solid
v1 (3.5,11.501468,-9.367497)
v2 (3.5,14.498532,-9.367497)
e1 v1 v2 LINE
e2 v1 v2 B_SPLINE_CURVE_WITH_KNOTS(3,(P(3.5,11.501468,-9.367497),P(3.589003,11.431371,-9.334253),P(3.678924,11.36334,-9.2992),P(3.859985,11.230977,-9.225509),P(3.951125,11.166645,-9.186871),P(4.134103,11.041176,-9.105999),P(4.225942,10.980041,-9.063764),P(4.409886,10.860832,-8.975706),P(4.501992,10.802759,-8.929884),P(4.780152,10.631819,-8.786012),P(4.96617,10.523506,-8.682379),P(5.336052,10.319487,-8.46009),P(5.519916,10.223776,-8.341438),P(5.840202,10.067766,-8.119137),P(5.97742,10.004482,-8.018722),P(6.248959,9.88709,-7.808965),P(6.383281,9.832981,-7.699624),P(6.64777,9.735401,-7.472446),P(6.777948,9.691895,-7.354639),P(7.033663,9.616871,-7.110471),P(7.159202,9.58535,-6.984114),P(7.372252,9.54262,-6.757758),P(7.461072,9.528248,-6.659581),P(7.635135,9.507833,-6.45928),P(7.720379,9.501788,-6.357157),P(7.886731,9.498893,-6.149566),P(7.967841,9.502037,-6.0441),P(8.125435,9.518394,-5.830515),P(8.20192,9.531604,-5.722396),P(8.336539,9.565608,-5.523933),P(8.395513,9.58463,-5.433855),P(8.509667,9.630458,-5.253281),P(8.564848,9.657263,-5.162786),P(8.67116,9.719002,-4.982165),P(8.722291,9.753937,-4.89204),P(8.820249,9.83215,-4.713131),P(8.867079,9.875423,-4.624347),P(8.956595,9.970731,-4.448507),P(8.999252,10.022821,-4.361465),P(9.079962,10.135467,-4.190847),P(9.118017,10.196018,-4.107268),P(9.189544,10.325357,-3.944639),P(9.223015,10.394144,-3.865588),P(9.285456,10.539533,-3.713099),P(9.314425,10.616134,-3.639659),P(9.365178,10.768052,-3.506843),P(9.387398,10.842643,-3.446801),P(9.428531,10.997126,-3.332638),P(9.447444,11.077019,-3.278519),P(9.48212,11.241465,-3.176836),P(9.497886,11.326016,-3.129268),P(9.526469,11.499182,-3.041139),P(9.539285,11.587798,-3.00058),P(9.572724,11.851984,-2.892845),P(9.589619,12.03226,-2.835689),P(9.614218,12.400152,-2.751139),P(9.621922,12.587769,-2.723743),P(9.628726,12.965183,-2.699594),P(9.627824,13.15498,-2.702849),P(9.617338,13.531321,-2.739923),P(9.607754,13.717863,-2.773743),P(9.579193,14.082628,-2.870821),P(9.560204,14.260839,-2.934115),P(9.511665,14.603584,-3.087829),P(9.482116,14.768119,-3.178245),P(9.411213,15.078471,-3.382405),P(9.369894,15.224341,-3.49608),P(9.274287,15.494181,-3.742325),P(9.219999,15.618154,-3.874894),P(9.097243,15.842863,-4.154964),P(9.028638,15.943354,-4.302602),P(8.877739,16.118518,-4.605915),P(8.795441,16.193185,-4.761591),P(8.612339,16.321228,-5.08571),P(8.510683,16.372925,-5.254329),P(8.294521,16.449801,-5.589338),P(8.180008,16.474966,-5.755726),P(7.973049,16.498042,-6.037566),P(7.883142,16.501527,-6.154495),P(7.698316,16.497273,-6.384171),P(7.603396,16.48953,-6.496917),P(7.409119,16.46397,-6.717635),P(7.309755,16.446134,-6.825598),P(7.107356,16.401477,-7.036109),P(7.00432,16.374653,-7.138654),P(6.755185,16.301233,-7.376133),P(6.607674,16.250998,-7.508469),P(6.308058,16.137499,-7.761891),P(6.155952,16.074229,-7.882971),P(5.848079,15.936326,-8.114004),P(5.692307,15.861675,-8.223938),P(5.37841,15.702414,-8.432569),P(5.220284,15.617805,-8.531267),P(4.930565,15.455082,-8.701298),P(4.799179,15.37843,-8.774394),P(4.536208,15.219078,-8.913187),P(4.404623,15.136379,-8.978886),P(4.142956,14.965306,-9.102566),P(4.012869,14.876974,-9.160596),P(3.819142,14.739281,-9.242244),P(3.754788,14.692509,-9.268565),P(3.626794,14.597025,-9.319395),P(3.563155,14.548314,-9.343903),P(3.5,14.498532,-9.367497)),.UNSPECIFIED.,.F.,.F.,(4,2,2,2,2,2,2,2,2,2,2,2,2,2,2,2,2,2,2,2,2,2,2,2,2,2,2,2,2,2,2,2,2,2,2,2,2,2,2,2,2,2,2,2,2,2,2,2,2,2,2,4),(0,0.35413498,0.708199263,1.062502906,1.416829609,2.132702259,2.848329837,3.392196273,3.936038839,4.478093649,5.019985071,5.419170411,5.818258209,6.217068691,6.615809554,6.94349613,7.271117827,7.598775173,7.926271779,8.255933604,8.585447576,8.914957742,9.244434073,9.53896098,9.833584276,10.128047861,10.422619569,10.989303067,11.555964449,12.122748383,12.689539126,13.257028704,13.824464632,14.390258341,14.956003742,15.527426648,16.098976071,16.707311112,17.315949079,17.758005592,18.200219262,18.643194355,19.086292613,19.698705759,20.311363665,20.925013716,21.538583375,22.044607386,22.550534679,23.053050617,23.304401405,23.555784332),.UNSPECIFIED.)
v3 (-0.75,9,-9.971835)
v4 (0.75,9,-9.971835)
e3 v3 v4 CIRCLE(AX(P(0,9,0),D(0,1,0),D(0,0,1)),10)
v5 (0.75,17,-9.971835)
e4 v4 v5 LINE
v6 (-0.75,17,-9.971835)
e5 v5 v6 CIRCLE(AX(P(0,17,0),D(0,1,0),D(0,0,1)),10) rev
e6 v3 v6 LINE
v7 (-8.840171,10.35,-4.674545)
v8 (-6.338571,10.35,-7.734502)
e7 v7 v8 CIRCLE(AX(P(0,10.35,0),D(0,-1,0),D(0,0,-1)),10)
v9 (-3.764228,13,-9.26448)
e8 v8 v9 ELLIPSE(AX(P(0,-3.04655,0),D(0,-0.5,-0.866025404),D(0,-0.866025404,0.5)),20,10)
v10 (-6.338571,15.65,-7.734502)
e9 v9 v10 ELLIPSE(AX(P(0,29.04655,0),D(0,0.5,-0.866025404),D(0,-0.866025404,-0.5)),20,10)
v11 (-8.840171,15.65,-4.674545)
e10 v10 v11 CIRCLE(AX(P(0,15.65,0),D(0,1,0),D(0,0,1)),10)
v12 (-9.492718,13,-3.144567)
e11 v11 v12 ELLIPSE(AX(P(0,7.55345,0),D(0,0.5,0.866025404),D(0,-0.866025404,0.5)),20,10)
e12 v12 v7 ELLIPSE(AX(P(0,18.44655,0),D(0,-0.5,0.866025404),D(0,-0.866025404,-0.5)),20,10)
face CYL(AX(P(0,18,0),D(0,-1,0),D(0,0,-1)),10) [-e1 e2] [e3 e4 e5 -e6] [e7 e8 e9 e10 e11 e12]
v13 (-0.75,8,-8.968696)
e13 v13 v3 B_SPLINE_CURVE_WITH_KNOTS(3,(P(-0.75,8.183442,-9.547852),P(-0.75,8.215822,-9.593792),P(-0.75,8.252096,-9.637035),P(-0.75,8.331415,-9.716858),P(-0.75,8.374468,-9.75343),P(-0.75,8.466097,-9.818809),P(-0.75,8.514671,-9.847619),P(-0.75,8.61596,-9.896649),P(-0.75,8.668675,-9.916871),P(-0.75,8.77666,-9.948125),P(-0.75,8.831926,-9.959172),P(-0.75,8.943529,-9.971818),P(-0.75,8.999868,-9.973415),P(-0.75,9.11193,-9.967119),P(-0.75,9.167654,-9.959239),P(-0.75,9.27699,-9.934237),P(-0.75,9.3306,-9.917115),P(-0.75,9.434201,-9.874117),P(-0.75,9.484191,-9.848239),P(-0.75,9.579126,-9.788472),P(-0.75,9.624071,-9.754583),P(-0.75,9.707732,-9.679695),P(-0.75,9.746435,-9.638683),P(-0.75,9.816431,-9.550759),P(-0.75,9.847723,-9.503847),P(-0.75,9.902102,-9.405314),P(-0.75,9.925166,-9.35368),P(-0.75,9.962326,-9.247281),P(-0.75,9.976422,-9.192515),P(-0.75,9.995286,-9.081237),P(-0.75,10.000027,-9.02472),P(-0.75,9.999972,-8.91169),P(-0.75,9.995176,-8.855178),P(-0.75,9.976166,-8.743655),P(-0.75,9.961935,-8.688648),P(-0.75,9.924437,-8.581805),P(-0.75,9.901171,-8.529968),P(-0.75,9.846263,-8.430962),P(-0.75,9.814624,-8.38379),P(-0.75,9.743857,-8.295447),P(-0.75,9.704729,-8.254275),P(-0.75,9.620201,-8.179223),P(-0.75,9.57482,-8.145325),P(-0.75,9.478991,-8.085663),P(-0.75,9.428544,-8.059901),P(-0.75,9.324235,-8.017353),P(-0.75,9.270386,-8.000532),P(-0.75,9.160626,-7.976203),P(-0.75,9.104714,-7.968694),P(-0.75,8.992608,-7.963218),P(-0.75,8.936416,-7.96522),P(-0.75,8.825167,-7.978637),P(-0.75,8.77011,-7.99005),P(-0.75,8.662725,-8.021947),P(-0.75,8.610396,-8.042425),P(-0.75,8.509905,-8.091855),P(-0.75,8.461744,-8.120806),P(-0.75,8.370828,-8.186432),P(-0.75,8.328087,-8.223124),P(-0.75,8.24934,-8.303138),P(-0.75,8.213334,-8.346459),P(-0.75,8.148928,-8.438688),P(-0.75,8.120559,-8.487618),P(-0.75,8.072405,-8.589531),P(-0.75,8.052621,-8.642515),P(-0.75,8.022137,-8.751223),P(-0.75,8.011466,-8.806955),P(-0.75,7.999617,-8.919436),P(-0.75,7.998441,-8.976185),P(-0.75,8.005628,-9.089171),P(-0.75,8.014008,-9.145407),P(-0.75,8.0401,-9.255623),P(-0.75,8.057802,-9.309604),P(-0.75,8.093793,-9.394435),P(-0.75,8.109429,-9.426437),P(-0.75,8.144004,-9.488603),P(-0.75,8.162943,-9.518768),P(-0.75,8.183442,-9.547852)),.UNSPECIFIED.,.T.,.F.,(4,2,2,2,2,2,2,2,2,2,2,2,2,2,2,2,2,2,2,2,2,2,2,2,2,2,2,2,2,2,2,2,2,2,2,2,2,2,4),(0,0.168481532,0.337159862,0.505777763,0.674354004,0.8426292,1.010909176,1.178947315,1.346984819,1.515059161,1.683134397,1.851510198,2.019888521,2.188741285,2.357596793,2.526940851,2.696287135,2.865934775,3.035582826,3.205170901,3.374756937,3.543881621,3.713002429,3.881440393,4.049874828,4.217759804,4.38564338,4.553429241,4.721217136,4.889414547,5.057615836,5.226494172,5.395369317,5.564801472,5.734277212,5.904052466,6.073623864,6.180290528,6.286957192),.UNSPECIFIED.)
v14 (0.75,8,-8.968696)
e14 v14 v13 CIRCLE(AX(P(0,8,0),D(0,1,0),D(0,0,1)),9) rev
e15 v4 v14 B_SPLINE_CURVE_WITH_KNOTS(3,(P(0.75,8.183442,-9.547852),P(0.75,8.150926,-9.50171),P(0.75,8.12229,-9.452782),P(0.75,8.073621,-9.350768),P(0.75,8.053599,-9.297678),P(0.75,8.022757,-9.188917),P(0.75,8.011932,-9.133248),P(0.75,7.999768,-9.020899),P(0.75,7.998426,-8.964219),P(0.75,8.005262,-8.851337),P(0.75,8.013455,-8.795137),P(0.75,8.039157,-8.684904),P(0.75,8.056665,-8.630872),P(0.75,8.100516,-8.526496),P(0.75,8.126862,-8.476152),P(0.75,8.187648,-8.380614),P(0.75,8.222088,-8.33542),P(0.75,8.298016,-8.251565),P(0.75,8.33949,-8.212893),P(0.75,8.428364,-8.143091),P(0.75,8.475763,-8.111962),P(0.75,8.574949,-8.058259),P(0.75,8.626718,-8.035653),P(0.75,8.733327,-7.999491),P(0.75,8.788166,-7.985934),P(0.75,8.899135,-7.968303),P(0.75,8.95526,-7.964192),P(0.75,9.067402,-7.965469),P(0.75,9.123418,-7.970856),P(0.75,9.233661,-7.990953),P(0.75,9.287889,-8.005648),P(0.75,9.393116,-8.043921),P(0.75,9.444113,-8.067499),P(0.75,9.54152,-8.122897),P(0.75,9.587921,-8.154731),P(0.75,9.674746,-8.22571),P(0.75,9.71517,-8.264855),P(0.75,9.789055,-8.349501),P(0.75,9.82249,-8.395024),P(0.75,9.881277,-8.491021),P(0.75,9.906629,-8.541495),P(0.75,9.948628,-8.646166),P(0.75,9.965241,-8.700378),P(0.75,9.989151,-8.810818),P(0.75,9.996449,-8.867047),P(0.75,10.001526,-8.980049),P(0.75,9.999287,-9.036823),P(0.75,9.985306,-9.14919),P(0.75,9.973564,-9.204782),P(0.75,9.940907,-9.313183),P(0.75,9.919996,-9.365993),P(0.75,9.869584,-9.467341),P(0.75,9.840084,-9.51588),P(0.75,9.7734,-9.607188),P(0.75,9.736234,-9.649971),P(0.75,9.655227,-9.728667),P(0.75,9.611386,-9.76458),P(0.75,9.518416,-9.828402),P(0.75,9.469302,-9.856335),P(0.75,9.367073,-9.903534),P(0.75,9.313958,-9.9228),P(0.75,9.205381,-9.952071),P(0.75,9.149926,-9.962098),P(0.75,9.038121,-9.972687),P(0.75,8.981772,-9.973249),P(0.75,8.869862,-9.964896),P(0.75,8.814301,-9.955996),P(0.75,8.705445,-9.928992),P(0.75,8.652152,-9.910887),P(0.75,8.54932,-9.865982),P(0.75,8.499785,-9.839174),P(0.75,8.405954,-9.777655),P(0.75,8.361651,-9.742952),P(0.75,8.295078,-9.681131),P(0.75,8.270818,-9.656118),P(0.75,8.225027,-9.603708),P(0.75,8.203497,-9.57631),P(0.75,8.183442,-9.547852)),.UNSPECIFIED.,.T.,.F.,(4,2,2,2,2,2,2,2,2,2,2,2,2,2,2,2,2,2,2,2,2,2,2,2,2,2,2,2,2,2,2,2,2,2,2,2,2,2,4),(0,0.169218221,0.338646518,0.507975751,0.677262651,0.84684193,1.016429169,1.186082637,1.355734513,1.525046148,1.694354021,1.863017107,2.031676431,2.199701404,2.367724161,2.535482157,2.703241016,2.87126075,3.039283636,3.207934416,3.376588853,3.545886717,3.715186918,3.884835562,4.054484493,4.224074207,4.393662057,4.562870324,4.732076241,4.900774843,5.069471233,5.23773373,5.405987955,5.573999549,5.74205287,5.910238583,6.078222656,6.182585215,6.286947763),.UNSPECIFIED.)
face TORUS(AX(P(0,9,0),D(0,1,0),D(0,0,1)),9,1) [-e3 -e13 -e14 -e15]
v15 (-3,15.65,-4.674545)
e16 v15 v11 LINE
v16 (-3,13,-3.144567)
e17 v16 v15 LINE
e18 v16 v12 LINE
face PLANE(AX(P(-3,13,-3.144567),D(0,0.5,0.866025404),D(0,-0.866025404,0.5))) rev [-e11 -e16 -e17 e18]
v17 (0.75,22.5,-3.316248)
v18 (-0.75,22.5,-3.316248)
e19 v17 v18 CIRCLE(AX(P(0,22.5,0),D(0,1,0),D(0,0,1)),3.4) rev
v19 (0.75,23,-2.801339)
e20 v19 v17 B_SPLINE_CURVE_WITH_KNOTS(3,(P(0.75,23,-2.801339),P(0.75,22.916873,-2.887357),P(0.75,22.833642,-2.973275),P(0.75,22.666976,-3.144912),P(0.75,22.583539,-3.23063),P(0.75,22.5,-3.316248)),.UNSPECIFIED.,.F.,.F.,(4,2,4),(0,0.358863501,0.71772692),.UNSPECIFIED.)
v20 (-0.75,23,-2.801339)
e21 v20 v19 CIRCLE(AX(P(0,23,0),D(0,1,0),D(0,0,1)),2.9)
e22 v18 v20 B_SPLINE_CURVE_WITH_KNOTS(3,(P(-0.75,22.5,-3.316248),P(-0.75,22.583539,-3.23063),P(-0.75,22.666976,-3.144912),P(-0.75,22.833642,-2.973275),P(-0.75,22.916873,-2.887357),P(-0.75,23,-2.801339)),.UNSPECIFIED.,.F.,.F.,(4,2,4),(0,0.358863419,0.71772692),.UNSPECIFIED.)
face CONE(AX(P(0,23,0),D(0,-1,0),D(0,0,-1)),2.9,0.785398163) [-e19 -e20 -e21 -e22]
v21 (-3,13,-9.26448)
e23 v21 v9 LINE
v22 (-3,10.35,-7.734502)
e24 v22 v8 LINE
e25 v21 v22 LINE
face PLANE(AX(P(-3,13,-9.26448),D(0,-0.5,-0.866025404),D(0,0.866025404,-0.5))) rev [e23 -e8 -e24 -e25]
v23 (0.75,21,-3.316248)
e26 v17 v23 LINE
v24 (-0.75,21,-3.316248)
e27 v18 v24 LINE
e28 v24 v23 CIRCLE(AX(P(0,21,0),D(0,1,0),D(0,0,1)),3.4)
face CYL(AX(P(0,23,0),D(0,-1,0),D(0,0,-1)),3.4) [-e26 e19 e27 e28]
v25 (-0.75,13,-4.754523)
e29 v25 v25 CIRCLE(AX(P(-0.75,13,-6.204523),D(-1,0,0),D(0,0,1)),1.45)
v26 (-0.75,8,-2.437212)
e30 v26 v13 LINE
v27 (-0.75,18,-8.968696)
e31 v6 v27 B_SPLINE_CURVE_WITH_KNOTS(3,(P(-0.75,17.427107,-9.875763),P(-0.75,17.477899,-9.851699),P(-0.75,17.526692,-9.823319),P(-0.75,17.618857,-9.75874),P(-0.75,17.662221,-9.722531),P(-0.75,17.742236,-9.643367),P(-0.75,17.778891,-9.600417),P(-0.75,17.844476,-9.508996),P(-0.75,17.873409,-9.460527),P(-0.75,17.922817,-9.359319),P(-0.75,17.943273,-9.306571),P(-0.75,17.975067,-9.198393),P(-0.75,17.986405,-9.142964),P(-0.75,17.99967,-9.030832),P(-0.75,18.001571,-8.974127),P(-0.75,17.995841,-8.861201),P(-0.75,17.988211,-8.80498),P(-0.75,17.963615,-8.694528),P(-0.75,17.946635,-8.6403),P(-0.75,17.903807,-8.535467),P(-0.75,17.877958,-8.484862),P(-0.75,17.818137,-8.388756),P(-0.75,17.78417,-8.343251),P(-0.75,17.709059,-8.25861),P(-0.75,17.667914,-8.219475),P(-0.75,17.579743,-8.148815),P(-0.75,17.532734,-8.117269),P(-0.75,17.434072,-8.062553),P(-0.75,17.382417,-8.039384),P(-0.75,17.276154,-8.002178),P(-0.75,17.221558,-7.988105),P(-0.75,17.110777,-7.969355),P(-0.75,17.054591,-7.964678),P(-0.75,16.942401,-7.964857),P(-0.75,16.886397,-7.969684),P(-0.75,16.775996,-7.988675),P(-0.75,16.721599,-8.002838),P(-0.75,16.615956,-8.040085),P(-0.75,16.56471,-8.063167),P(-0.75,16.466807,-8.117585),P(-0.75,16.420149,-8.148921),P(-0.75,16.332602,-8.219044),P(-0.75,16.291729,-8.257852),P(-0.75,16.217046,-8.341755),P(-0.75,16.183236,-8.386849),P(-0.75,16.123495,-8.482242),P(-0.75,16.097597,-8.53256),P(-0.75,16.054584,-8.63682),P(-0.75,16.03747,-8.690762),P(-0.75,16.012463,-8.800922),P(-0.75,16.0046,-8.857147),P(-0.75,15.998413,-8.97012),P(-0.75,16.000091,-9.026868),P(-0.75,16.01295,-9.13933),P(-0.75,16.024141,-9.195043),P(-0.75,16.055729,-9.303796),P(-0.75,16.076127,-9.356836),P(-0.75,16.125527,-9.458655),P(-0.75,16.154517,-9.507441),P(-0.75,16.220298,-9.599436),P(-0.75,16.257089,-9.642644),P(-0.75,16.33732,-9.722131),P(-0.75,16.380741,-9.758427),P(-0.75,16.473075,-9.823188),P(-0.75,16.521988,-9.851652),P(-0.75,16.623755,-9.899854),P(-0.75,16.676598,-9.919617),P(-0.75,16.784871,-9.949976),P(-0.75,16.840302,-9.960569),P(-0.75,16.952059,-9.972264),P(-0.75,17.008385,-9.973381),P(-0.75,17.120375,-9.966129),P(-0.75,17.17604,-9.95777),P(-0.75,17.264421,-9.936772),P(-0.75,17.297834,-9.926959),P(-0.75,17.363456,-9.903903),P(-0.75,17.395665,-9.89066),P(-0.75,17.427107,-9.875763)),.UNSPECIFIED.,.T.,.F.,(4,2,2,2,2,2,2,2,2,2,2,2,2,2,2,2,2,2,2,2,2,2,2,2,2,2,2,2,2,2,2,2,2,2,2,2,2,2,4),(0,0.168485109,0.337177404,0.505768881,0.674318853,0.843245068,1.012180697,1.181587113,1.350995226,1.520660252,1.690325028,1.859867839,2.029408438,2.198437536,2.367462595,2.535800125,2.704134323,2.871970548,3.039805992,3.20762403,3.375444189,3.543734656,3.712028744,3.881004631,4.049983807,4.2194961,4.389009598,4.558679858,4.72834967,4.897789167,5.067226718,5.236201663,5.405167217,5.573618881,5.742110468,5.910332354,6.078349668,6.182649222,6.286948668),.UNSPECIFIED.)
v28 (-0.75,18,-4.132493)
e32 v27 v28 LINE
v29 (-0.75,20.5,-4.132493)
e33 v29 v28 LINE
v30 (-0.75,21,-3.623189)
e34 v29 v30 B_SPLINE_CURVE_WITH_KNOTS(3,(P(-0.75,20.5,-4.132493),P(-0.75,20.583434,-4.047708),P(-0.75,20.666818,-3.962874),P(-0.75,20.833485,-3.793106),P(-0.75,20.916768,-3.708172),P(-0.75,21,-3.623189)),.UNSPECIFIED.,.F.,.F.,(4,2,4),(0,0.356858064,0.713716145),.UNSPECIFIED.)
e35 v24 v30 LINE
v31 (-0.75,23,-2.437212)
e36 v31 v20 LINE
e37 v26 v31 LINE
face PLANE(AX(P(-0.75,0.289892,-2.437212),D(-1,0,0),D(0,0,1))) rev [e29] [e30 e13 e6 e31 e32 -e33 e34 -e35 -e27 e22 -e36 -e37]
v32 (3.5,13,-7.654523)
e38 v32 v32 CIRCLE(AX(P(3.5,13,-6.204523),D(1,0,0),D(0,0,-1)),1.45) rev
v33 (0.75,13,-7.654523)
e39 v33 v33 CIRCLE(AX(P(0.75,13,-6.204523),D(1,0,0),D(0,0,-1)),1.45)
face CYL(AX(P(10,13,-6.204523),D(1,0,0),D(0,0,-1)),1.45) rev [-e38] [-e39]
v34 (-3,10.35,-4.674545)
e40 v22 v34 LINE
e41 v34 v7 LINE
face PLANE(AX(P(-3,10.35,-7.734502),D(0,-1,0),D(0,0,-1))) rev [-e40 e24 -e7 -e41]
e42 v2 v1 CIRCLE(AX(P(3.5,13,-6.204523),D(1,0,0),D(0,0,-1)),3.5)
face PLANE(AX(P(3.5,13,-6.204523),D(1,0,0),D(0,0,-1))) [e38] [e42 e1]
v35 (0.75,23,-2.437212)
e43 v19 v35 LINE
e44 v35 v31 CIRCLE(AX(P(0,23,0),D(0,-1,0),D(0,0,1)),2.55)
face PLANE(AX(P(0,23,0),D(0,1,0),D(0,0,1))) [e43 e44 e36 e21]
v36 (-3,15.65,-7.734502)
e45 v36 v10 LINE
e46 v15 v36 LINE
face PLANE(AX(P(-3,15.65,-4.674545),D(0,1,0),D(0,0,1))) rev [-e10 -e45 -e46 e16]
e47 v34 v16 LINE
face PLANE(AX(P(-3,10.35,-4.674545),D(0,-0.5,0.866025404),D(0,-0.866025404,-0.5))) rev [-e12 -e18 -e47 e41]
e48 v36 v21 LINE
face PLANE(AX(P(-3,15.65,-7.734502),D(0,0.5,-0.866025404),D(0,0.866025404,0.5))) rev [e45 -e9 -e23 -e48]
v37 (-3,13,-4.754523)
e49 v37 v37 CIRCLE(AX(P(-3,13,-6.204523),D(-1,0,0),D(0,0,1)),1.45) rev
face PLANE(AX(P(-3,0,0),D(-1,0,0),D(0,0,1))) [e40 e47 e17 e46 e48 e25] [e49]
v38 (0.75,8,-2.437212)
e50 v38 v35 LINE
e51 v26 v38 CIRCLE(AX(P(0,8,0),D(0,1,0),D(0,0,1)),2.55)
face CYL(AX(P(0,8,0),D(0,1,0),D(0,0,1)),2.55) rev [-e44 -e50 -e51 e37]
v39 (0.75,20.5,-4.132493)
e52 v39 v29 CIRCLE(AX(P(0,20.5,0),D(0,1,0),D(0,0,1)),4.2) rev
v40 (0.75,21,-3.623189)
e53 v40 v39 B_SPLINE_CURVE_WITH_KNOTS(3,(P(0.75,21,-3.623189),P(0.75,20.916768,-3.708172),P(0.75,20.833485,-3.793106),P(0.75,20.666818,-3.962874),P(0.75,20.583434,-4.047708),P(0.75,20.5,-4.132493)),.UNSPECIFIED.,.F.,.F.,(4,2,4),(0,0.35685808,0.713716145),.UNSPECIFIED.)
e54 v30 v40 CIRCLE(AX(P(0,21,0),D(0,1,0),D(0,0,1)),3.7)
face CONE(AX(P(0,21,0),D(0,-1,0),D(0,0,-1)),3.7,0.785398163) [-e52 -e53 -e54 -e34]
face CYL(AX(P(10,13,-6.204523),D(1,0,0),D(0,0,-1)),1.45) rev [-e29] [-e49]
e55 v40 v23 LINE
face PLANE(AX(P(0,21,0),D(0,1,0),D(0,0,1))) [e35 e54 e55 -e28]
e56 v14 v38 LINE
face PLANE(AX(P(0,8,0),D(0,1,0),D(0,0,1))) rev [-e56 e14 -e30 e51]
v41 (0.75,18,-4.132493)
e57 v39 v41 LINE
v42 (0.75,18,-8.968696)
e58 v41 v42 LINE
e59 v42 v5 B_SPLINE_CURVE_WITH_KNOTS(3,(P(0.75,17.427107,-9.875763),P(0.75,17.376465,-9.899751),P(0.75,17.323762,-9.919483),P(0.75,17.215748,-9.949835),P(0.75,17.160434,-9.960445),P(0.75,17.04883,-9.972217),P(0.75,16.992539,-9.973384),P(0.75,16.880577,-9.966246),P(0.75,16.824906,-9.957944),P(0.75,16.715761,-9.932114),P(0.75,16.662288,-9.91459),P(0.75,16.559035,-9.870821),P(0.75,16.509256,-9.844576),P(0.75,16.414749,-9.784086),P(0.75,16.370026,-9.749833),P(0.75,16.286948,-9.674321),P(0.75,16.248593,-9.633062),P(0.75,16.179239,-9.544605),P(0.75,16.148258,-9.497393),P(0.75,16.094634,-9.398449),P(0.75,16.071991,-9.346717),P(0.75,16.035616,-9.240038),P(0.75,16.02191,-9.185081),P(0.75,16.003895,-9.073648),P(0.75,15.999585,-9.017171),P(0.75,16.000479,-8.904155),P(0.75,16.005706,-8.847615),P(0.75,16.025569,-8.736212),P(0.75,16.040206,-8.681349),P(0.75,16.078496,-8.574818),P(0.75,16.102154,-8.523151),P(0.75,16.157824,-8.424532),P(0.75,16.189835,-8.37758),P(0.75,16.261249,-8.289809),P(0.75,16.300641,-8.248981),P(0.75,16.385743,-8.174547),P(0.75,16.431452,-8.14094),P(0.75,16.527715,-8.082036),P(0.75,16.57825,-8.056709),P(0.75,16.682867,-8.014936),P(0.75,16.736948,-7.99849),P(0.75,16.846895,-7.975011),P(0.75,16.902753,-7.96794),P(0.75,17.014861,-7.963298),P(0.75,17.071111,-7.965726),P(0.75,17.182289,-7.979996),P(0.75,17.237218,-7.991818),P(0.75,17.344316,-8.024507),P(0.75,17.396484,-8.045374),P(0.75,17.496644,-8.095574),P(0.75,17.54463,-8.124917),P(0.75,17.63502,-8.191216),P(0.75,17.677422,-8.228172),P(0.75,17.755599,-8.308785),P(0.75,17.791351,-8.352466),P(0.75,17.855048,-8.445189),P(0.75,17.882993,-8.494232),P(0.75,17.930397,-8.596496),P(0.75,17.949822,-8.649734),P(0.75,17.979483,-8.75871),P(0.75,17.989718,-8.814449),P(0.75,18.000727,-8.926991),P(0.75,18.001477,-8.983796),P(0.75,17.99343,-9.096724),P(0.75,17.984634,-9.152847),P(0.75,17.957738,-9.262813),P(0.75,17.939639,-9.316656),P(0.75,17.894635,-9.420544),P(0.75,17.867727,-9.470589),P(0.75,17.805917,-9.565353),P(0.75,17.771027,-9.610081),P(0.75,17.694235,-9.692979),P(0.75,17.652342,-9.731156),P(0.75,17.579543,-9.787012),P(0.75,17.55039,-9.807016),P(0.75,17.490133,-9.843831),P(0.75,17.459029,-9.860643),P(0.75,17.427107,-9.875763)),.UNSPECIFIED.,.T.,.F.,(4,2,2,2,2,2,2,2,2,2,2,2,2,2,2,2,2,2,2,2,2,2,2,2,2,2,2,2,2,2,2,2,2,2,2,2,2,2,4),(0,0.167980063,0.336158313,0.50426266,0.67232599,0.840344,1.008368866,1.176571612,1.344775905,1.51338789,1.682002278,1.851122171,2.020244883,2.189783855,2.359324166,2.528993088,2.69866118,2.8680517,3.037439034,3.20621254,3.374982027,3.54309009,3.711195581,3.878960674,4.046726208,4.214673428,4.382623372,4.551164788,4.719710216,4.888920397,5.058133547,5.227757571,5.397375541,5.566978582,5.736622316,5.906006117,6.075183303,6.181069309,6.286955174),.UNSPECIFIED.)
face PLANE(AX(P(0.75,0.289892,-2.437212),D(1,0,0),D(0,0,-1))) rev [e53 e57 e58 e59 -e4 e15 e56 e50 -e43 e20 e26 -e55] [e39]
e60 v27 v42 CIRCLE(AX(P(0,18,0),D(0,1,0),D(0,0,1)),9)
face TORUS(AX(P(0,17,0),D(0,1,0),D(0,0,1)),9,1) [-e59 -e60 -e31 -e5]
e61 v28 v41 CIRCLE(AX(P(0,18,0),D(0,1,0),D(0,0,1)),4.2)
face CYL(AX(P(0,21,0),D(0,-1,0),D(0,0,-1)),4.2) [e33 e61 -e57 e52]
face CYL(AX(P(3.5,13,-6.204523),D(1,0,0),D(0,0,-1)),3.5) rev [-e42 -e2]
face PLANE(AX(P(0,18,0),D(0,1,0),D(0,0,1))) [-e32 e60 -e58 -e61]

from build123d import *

# Parameters (mm, degrees)
SKETCH1_R              = 4.05
BOSS_EXTRUDE1_DEPTH    = 8
SKETCH2_R              = 10
BOSS_EXTRUDE2_DEPTH    = 10
FILLET1_R              = 1
SKETCH3_R              = 2.55
CUT_EXTRUDE1_DEPTH     = 10
CUT_EXTRUDE2_REACH     = 24.891
M2_5_CLEARANCE_HOLE1_D = 2.9
SKETCH28_R             = 3.5
CUT_EXTRUDE3_DEPTH     = 6.5
SKETCH29_W             = 8.1
SKETCH29_H             = 0.5
CUT_EXTRUDE7_DEPTH     = 23.891046451
FILLET2_R              = 0.25
BOSS_EXTRUDE3_START    = 5
BOSS_EXTRUDE3_DEPTH    = 5
CHAMFER1_SIZE          = 0.5
CUT_EXTRUDE8_DEPTH     = 7
BOSS_EXTRUDE4_START    = -2
BOSS_EXTRUDE4_DEPTH    = 3
CHAMFER2_SIZE          = 0.5
SKETCH35_R             = 4.05
CUT_EXTRUDE9_DEPTH     = 8


with BuildPart() as part:
    # Sketch1 → Boss-Extrude1 (new body)
    with BuildSketch(Plane(origin=(0, 0, 0), x_dir=(1, 0, 0), z_dir=(0, 1, 0))):
        with Locations(Location((0, 0, 0), (0, 0, 270))):
            Circle(SKETCH1_R)
    extrude(amount=BOSS_EXTRUDE1_DEPTH)

    # Sketch2 → Boss-Extrude2 (add)
    with BuildSketch(Plane(origin=(0, 8, 0), x_dir=(1, 0, 0), z_dir=(0, 1, 0))):
        with Locations(Location((0, 0, 0), (0, 0, 270))):
            Circle(SKETCH2_R)
    extrude(amount=BOSS_EXTRUDE2_DEPTH)

    # Fillet1
    fillet1_edges = [part.edges().sort_by_distance(p)[0] for p in [
        (0, 0, -4.05),
        (0, 8, -10),
        (0, 18, -10),
    ]]
    fillet(fillet1_edges, radius=FILLET1_R)

    # Sketch3 → Cut-Extrude1 (cut)
    with BuildSketch(Plane(origin=(0, 18, 0), x_dir=(1, 0, 0), z_dir=(0, 1, 0))):
        with Locations(Location((0, 0, 0), (0, 0, 270))):
            Circle(SKETCH3_R)
    extrude(amount=-CUT_EXTRUDE1_DEPTH, mode=Mode.SUBTRACT)

    # Cut-Extrude2: up to this face of the body (flat: up to its plane)
    cut_extrude2_end = Plane(part.part.faces().sort_by_distance((0, 8, -8.745441559))[0])
    # Sketch20 → Cut-Extrude2 (cut, up to the picked face)
    with BuildSketch(Plane(origin=(0, 18, 0), x_dir=(1, 0, 0), z_dir=(0, 1, 0)), mode=Mode.PRIVATE) as cut_extrude2_sk1:
        with BuildLine():
            Line((-0.75, 2.437211521), (0.75, 2.437211521))
            Line((0.75, 2.437211521), (0.75, 9.971835338))
            ThreePointArc((0.75, 9.971835338), (0, 10), (-0.75, 9.971835338))
            Line((-0.75, 9.971835338), (-0.75, 2.437211521))
        make_face()
    cut_extrude2_tool1 = split(extrude(cut_extrude2_sk1.sketch, amount=-CUT_EXTRUDE2_REACH, mode=Mode.PRIVATE), bisect_by=cut_extrude2_end, keep=Keep.BOTH, mode=Mode.PRIVATE)
    add(cut_extrude2_tool1.solids().sort_by(Axis((0, 18, -6.213919), (0, -1, 0)))[0], mode=Mode.SUBTRACT)

    # M2.5 Clearance Hole1 (through all)
    with Locations(Plane(origin=(10, 0, 0), x_dir=(0, 0, -1), z_dir=(1, 0, 0))):
        with Locations((6.204523429, 13)):
            Hole(M2_5_CLEARANCE_HOLE1_D / 2)

    # Sketch28 → Cut-Extrude3 (cut)
    with BuildSketch(Plane(origin=(10, 0, 0), x_dir=(0, 0, -1), z_dir=(1, 0, 0))):
        with Locations((6.204523429, 13)):
            Circle(SKETCH28_R)
    extrude(amount=-CUT_EXTRUDE3_DEPTH, mode=Mode.SUBTRACT)

    # Sketch29 → Cut-Extrude7 (cut, through all)
    with BuildSketch(Plane.XY):
        with Locations((0, 7.75)):
            Rectangle(SKETCH29_W, SKETCH29_H)
    extrude(amount=-CUT_EXTRUDE7_DEPTH, mode=Mode.SUBTRACT)

    # Fillet2
    fillet2_edges = [part.edges().sort_by_distance(p)[0] for p in [
        (-3.3, 8, 0),
        (3.3, 8, 0),
        (0, 7.5, 0),
    ]]
    fillet(fillet2_edges, radius=FILLET2_R - 0.0001)  # a hair under: the kernel refuses the full size

    # Sketch30 → Boss-Extrude3 (add)
    with BuildSketch(Plane(origin=(0, 18, 0), x_dir=(1, 0, 0), z_dir=(0, 1, 0)).offset(BOSS_EXTRUDE3_START)):
        with BuildLine():
            Line((-0.75, 3.31624788), (-0.75, 2.437211521))
            ThreePointArc((-0.75, 2.437211521), (0, -2.55), (0.75, 2.437211521))
            Line((0.75, 2.437211521), (0.75, 3.31624788))
            ThreePointArc((0.75, 3.31624788), (0, -3.4), (-0.75, 3.31624788))
        make_face()
    extrude(amount=-BOSS_EXTRUDE3_DEPTH)

    # Chamfer1
    chamfer1_edges = [part.edges().sort_by_distance(p)[0] for p in [
        (0, 23, 3.4),
    ]]
    chamfer(chamfer1_edges, length=CHAMFER1_SIZE)

    # Sketch33 → Cut-Extrude8 (cut)
    with BuildSketch(Plane.ZY.offset(10)):
        Polygon((-3.144567003, 13), (-4.674545216, 15.65), (-7.734501643, 15.65), (-9.264479856, 13), (-7.734501643, 10.35), (-4.674545216, 10.35), align=None)
    extrude(amount=-CUT_EXTRUDE8_DEPTH, mode=Mode.SUBTRACT)

    # Sketch34 → Boss-Extrude4 (add)
    with BuildSketch(Plane(origin=(0, 23, 0), x_dir=(1, 0, 0), z_dir=(0, 1, 0)).offset(BOSS_EXTRUDE4_START)):
        with BuildLine():
            Line((-0.75, 3.31624788), (-0.75, 4.132493194))
            ThreePointArc((-0.75, 4.132493194), (0, -4.2), (0.75, 4.132493194))
            Line((0.75, 4.132493194), (0.75, 3.31624788))
            ThreePointArc((0.75, 3.31624788), (0, -3.4), (-0.75, 3.31624788))
        make_face()
    extrude(amount=-BOSS_EXTRUDE4_DEPTH)

    # Chamfer2
    chamfer2_edges = [part.edges().sort_by_distance(p)[0] for p in [
        (0, 21, 4.2),
    ]]
    chamfer(chamfer2_edges, length=CHAMFER2_SIZE)

    # Sketch35 → Cut-Extrude9 (cut)
    with BuildSketch(Plane.XZ):
        Circle(SKETCH35_R)
    extrude(amount=-CUT_EXTRUDE9_DEPTH, mode=Mode.SUBTRACT)


solid = part.part
